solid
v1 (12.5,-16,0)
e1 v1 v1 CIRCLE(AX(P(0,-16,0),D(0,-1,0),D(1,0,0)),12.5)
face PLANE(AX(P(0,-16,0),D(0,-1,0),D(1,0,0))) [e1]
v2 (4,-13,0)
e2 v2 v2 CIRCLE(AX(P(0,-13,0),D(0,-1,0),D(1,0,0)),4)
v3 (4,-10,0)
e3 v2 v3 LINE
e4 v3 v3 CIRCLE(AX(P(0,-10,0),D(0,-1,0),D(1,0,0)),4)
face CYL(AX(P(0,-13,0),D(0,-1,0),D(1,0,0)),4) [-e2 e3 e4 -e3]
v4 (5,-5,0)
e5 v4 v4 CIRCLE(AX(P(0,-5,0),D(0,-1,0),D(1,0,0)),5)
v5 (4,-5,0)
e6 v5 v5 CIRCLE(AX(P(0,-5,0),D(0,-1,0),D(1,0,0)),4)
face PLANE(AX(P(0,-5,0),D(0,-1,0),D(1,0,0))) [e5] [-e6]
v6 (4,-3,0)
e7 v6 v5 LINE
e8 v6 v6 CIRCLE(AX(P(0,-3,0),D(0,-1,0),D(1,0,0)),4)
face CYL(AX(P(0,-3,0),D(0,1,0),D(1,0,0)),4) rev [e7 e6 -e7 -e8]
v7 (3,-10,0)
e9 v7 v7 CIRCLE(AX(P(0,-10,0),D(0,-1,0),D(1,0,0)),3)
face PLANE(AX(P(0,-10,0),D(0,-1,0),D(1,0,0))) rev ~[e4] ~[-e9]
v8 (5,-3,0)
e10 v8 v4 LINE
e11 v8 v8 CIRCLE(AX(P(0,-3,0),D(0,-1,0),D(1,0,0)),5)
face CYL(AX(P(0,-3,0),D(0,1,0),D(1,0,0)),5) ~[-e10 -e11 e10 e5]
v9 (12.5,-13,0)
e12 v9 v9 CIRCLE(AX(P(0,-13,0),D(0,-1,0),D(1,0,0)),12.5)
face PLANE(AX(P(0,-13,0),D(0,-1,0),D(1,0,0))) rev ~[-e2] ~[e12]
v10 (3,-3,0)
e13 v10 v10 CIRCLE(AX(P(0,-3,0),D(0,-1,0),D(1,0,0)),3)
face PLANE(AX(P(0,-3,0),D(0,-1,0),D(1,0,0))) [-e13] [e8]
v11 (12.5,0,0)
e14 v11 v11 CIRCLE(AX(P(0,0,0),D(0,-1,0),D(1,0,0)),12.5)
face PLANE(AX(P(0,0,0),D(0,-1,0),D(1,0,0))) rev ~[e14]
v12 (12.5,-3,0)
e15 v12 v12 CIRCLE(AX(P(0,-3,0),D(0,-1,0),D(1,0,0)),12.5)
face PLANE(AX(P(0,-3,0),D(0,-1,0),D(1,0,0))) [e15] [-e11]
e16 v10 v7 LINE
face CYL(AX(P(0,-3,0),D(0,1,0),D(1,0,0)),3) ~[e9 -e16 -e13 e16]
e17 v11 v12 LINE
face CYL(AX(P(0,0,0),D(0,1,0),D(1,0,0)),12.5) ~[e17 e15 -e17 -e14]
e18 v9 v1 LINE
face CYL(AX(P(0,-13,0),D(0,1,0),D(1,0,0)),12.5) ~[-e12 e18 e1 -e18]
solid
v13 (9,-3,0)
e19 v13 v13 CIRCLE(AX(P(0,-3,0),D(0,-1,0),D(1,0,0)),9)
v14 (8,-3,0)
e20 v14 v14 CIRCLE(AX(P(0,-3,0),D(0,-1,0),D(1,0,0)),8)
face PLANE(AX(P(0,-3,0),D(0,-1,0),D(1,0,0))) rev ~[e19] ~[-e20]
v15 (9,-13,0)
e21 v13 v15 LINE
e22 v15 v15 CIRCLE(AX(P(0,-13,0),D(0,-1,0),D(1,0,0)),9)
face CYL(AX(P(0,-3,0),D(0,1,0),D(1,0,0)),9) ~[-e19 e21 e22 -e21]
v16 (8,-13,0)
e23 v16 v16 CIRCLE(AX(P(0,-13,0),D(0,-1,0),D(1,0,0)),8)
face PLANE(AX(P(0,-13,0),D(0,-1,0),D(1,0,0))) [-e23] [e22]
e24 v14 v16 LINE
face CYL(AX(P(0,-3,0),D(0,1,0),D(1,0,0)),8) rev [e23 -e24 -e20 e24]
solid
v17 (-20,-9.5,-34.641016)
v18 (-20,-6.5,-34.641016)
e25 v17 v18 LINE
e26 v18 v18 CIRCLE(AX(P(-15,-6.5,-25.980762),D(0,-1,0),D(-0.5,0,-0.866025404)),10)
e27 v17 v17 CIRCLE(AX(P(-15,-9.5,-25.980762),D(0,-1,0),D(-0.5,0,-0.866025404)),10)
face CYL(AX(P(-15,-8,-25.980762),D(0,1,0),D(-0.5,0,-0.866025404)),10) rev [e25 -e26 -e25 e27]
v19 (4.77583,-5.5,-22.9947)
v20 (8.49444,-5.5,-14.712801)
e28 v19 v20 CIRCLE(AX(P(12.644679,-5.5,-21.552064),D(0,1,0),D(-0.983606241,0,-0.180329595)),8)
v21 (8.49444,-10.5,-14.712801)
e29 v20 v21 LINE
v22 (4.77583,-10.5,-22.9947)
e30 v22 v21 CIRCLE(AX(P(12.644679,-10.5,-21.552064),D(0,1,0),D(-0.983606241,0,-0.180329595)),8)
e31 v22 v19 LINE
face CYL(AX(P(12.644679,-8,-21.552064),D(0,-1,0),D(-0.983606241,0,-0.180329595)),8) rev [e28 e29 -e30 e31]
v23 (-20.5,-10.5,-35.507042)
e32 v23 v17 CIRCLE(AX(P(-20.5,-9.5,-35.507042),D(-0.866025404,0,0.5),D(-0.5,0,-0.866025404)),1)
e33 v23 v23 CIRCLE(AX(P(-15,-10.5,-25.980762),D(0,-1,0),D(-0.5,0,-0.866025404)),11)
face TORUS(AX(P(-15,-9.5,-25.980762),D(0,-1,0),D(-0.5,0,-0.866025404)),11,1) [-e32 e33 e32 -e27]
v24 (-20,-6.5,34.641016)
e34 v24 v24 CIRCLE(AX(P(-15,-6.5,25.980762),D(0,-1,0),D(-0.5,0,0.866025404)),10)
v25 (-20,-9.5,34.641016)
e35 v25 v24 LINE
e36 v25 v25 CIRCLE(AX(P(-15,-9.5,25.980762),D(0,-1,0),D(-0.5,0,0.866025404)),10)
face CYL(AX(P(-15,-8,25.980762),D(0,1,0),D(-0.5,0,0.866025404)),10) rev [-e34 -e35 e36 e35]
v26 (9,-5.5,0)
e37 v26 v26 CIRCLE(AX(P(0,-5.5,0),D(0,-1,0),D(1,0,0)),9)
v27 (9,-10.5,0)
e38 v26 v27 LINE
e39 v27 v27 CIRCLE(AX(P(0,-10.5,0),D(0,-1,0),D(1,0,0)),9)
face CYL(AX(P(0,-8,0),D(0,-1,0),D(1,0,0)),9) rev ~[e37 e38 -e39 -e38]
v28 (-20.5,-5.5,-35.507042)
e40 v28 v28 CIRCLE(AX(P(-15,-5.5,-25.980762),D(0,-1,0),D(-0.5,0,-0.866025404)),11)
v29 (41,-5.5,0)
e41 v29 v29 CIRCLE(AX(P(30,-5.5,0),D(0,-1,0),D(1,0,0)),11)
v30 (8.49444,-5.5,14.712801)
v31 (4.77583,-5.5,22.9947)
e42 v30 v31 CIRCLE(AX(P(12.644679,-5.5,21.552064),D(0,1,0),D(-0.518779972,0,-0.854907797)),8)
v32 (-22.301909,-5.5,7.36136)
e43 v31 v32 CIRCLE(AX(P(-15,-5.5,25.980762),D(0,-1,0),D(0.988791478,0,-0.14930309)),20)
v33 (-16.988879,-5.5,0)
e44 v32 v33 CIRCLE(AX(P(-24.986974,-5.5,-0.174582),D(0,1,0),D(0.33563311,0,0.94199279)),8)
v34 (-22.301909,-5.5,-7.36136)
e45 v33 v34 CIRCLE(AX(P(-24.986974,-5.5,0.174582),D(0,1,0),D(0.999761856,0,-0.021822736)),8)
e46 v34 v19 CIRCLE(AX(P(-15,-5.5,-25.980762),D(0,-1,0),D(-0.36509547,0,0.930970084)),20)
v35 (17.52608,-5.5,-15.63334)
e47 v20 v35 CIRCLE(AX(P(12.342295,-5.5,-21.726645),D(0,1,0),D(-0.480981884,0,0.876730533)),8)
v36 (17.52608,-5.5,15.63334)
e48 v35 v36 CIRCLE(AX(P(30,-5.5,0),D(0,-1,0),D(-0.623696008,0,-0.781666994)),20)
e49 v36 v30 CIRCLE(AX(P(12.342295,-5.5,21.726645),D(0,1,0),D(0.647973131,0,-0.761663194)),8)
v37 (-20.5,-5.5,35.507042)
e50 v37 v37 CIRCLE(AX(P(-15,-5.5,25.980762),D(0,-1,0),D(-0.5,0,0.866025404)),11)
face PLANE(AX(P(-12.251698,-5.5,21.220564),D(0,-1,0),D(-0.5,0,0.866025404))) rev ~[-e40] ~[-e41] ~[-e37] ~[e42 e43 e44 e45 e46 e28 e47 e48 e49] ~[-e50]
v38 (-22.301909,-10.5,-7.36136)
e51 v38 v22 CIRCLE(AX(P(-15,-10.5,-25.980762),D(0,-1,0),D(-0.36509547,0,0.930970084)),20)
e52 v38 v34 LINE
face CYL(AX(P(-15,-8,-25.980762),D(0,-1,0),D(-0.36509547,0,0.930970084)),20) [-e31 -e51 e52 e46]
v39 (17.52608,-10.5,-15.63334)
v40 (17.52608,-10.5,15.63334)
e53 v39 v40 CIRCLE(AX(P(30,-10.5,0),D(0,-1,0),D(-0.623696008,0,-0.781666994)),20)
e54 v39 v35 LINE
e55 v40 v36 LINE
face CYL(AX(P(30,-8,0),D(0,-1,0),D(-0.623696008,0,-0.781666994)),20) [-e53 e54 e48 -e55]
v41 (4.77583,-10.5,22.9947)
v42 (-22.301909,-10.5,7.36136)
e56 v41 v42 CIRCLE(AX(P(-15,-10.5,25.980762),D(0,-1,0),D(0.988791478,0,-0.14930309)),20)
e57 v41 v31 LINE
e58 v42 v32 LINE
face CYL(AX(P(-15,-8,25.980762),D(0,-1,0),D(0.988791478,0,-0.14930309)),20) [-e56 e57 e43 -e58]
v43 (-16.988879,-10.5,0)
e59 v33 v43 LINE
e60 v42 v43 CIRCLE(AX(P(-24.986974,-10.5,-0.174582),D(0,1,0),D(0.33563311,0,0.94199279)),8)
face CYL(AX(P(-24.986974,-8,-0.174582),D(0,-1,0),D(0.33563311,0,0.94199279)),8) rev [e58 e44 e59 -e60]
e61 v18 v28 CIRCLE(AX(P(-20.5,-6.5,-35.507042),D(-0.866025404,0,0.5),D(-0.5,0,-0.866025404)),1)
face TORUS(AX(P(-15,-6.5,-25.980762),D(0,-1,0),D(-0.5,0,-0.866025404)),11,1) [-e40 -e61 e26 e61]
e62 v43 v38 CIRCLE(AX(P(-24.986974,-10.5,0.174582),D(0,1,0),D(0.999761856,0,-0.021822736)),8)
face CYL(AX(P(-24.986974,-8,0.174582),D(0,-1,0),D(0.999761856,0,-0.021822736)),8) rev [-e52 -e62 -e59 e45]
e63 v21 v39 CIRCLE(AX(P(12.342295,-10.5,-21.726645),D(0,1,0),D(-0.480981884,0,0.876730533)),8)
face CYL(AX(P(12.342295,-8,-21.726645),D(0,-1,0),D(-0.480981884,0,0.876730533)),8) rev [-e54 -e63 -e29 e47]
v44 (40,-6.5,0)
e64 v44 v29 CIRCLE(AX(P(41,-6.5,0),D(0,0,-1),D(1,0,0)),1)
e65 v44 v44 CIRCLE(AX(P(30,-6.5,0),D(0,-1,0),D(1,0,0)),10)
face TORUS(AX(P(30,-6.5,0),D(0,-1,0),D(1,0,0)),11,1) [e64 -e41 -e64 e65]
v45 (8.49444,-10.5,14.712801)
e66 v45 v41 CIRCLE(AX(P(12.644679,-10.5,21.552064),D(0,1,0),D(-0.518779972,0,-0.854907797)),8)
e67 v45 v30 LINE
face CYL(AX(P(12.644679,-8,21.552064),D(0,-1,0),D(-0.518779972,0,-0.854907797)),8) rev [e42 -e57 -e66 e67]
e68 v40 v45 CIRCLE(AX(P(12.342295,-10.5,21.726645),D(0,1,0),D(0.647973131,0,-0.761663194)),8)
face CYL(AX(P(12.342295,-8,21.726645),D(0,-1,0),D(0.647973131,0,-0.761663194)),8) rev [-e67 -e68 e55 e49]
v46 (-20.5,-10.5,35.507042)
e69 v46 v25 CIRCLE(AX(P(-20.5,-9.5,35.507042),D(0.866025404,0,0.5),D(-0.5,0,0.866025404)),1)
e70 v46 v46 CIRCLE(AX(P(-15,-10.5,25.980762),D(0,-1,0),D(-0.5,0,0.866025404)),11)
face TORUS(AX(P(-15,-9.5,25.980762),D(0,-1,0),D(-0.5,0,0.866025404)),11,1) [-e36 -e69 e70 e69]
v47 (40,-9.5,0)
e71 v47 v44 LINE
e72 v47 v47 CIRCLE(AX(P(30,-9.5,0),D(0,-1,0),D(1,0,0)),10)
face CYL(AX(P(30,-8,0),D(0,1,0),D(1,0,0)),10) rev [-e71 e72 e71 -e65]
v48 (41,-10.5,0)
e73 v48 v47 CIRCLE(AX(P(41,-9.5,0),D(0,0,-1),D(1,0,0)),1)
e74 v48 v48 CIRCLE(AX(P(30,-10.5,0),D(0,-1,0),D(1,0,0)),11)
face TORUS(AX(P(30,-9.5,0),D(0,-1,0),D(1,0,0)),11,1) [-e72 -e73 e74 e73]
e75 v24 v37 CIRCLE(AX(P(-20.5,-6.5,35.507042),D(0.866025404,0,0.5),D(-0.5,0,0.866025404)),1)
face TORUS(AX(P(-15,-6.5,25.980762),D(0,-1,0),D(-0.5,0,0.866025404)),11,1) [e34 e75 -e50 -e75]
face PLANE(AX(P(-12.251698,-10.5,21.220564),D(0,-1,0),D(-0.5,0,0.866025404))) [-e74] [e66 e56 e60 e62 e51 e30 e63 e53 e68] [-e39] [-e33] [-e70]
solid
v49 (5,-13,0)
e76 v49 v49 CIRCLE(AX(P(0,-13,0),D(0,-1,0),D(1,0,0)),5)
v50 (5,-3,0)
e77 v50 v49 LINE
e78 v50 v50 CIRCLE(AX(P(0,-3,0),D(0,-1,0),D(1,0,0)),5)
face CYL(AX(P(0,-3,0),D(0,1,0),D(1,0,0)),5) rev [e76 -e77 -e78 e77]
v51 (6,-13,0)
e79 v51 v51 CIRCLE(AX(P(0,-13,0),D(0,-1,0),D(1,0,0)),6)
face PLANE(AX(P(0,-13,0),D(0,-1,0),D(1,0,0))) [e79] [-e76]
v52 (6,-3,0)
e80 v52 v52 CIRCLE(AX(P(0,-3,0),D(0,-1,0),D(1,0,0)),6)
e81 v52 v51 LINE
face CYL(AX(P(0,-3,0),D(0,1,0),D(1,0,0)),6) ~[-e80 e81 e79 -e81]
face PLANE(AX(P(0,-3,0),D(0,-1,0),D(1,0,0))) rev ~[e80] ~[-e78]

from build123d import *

# Parameters (mm, degrees)
F0_R      = 12.5
F1_DEPTH  = 3
F2_R      = 5
F2_R_2    = 4
F3_DEPTH  = 2
F4_R      = 3
F5_DEPTH  = 10
F7_R      = 6
F7_R_2    = 5
F8_DEPTH  = 10
F9_R      = 9
F9_R_2    = 8
F10_DEPTH = 10
F12_R     = 12.5
F13_DEPTH = 3
F14_R     = 4
F14_R_2   = 3
F15_DEPTH = 3
F17_R     = 10
F18_DEPTH = 2.5
F19_R     = 1
F20_COUNT = 3
F21_R     = 9
F22_DEPTH = 12.5


with BuildPart() as f1:
    # F0 (on Front) → F1 (new body)
    with BuildSketch(Plane.XZ):
        Circle(F0_R)
    extrude(amount=F1_DEPTH)

    # F2 (on face) → F3 (join)
    with BuildSketch(Plane.XZ.offset(3)):
        Circle(F2_R)
        Circle(F2_R_2, mode=Mode.SUBTRACT)
    extrude(amount=F3_DEPTH)

    # F4 (on face) → F5 (join)
    with BuildSketch(Plane.XZ.offset(3)):
        Circle(F4_R)
    extrude(amount=F5_DEPTH)

    # F12 (on offset) → F13 (join)
    with BuildSketch(Plane.XZ.offset(13)):
        Circle(F12_R)
    extrude(amount=F13_DEPTH)

    # F14 (on offset) → F15 (join)
    with BuildSketch(Plane.XZ.offset(13)):
        Circle(F14_R)
        Circle(F14_R_2, mode=Mode.SUBTRACT)
    extrude(amount=-F15_DEPTH)


with BuildPart() as f8:
    # F7 (on offset) → F8 (new body)
    with BuildSketch(Plane.XZ.offset(3)):
        Circle(F7_R)
        Circle(F7_R_2, mode=Mode.SUBTRACT)
    extrude(amount=F8_DEPTH)


with BuildPart() as f10:
    # F9 (on offset) → F10 (new body)
    with BuildSketch(Plane.XZ.offset(3)):
        Circle(F9_R)
        Circle(F9_R_2, mode=Mode.SUBTRACT)
    extrude(amount=F10_DEPTH)


with BuildPart() as f18:
    # F17 (on offset) → F18 (new body, symmetric)
    with BuildSketch(Plane.XZ.offset(8)):
        with BuildLine():
            Line((8.4944397181, 14.7128011735), (0, 0))
            Line((0, 0), (8.4944397181, -14.7128011735))
            ThreePointArc((8.4944397181, -14.7128011735), (13.1534822559, -13.7678782634), (17.5260798395, -15.6333398808))
            ThreePointArc((17.5260798395, -15.6333398808), (50, 0), (17.5260798395, 15.6333398808))
            ThreePointArc((17.5260798395, 15.6333398808), (13.1534822559, 13.7678782634), (8.4944397181, 14.7128011735))
        make_face()
        with Locations((30, 0)):
            Circle(F17_R, mode=Mode.SUBTRACT)
    extrude(amount=F18_DEPTH, both=True)

    # F19
    f19_edges = [f18.edges().sort_by_distance(p)[0] for p in [
        (20, -10.5, 0),
        (20, -5.5, 0),
    ]]
    fillet(f19_edges, radius=F19_R)

    # F20: F18 ×3 about axis
    f20_axis = Axis((0, -3, 0), (0, 1, 0))


with BuildPart() as f18_1:
    add(f18.part)
    for i in range(1, F20_COUNT):
        add(f18.part.rotate(f20_axis, i * 360 / F20_COUNT))

    # F21 (on offset) → F22 (cut, symmetric)
    with BuildSketch(Plane.XZ.offset(8)):
        Circle(F21_R)
    extrude(amount=F22_DEPTH, both=True, mode=Mode.SUBTRACT)


solid = Compound([f1.part, f8.part, f10.part, f18_1.part])
